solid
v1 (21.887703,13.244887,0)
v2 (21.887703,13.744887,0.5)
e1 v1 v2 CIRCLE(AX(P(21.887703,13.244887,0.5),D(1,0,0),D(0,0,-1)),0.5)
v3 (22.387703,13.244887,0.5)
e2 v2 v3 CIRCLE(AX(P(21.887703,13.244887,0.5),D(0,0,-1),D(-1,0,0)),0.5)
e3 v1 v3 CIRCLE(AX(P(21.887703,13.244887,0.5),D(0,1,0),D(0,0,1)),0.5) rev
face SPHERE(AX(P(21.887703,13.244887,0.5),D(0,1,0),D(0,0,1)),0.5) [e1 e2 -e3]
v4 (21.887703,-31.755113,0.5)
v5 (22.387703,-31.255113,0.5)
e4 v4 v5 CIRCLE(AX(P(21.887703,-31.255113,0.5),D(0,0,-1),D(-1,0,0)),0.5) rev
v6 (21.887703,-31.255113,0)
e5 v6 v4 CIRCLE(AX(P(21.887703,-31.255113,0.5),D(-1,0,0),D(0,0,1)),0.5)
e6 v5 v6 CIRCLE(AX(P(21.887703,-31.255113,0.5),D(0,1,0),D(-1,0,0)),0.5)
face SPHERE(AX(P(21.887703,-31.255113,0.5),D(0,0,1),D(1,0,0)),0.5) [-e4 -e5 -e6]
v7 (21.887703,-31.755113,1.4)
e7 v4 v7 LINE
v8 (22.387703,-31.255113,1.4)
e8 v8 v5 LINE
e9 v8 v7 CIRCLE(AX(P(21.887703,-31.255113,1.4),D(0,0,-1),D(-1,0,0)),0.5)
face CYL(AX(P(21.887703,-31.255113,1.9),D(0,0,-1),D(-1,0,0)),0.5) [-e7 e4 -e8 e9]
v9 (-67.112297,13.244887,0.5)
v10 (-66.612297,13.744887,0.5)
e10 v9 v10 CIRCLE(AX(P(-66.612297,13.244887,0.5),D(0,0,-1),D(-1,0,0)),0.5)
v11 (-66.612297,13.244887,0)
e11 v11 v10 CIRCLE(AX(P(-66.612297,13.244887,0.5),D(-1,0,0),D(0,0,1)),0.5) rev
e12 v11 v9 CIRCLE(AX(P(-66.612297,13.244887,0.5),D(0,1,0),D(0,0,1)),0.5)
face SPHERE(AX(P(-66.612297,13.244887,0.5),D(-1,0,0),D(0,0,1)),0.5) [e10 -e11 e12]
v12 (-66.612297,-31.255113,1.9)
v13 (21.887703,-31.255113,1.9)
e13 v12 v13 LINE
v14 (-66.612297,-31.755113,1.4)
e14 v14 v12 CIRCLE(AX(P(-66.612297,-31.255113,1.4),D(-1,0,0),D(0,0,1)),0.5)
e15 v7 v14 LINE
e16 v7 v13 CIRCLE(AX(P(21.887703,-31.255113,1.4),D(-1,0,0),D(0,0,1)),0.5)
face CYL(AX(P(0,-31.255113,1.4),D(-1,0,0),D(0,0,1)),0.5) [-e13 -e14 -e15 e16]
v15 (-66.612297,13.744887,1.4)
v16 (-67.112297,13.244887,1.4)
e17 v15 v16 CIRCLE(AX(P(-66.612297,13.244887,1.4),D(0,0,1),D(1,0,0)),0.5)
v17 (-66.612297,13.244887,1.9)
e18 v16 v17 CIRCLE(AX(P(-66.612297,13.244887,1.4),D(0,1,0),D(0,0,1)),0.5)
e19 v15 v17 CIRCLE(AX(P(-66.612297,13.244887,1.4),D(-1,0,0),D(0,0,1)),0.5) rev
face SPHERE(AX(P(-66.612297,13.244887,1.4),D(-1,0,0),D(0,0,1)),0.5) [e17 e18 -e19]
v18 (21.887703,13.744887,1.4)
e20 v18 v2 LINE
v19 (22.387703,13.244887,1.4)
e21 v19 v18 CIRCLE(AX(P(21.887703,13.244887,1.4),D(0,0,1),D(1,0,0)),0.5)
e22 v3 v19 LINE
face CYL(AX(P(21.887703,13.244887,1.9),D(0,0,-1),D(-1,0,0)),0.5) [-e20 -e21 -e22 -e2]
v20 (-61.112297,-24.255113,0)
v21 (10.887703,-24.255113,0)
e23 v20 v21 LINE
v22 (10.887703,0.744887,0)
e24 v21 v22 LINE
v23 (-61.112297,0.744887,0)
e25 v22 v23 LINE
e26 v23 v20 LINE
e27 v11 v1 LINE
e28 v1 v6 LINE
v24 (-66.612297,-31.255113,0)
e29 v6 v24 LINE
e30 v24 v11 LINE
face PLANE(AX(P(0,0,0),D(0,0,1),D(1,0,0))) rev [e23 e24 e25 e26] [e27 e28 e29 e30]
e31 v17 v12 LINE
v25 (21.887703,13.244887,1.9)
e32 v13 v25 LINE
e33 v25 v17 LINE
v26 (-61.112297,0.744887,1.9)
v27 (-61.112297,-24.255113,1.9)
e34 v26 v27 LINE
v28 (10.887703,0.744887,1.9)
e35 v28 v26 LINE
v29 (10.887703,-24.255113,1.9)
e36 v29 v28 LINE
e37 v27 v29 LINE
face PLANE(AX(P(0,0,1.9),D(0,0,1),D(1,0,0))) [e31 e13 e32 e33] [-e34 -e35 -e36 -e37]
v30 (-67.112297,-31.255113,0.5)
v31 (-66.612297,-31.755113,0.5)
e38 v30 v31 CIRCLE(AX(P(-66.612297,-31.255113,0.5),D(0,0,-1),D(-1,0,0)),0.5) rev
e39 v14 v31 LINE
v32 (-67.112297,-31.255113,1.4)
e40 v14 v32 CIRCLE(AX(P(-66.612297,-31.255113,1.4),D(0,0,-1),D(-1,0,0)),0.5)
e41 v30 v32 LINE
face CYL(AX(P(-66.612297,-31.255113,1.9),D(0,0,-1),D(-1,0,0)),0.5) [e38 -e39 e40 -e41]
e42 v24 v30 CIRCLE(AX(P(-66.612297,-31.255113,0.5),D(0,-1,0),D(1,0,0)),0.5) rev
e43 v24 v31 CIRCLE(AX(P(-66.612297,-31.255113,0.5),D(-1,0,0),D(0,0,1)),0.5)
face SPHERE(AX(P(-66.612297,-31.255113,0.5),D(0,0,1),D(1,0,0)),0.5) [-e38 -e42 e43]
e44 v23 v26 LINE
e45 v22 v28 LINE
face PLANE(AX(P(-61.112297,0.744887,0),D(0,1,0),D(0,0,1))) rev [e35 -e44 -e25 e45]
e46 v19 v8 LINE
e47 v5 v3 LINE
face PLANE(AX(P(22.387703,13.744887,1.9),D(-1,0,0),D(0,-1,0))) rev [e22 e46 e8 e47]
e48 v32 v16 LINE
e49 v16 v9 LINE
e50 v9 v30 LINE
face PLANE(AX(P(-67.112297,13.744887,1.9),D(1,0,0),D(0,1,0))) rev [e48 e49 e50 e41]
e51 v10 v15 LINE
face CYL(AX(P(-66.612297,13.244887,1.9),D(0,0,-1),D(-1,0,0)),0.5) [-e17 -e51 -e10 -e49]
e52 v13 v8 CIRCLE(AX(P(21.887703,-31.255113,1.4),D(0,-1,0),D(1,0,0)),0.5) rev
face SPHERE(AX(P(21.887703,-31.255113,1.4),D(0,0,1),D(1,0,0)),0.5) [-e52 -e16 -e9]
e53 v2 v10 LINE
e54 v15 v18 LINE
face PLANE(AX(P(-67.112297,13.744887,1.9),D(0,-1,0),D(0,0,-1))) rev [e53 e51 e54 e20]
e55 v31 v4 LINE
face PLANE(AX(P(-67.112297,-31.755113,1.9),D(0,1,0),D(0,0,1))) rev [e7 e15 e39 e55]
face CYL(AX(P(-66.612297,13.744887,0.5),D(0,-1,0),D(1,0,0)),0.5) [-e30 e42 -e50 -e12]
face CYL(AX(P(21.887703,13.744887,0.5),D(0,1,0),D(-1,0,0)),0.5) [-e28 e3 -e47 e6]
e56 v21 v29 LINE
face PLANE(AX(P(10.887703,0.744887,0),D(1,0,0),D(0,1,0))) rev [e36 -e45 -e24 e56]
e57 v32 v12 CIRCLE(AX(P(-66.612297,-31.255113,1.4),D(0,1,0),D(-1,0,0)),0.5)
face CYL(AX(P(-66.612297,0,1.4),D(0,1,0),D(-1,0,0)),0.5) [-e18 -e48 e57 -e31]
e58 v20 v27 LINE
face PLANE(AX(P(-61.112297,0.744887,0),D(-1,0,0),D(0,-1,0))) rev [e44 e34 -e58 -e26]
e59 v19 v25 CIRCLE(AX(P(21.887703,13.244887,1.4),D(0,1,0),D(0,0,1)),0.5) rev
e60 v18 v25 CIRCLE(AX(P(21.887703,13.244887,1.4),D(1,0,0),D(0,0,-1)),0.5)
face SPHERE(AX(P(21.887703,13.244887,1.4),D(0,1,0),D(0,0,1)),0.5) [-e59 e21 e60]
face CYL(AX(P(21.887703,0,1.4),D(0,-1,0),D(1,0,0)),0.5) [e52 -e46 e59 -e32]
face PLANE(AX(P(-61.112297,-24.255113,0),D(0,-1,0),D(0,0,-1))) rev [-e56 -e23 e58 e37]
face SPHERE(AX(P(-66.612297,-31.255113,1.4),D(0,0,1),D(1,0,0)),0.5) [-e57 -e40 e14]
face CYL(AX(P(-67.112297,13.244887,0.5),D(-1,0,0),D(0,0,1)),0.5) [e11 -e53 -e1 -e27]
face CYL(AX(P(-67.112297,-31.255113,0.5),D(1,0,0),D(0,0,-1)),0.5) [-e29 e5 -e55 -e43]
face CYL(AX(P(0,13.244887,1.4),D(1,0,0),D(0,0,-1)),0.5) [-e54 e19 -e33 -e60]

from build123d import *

# Parameters (mm, degrees)
SKETCH1_W               = 89.5
SKETCH1_H               = 45.5
BOSS_EXTRUDE1_DEPTH     = 1.9
FILLET1_R               = 0.5
FILLET2_R               = 0.5
CUT_EXTRUDE1_DEPTH      = 75.270166564
CUT_EXTRUDE1_DEPTH_BACK = 75.270166564
SKETCH2_W               = 72
SKETCH2_H               = 25


with BuildPart() as part:
    # Sketch1 → Boss-Extrude1 (new body)
    with BuildSketch(Plane.XY):
        with Locations((-22.362297468, -9.005112503)):
            Rectangle(SKETCH1_W, SKETCH1_H)
    extrude(amount=BOSS_EXTRUDE1_DEPTH)

    # Fillet1
    fillet1_edges = [part.edges().sort_by_distance(p)[0] for p in [
        (22.387702532, -9.005112503, 1.9),
        (-22.362297468, 13.744887497, 1.9),
        (-67.112297468, -9.005112503, 1.9),
        (-22.362297468, 13.744887497, 0),
        (22.387702532, -9.005112503, 0),
        (-67.112297468, -9.005112503, 0),
        (-67.112297468, 13.744887497, 0.95),
        (22.387702532, 13.744887497, 0.95),
        (22.387702532, -31.755112503, 0.95),
        (-67.112297468, -31.755112503, 0.95),
    ]]
    fillet(fillet1_edges, radius=FILLET1_R)

    # Fillet2
    # the kernel refuses this fillet: 0.5 mm, written as the material it takes off along each edge
    with BuildSketch(Plane(origin=(-66.612297468, -31.255112503, 1.4), x_dir=(0, -1, 0), z_dir=(0, 0, 1))) as fillet2_piece_1_section:
        Polygon((0, 0), (FILLET2_R, 0), (FILLET2_R, -FILLET2_R), (0, -FILLET2_R), align=None)
    fillet2_piece_1 = extrude(amount=FILLET2_R, mode=Mode.PRIVATE)
    fillet2_piece_1 = fillet2_piece_1 - Plane(origin=(-66.612297468, -31.255112503, 1.4), x_dir=(0.7071067811865475, 0.7071067811865477, 0), z_dir=(0, 0, 1)) * Sphere(FILLET2_R, mode=Mode.PRIVATE)
    add(fillet2_piece_1, mode=Mode.SUBTRACT)
    with BuildSketch(Plane(origin=(-66.612297468, -31.255112503, 0.5), x_dir=(0, -1, 0), z_dir=(0, 0, -1))) as fillet2_piece_2_section:
        Polygon((0, 0), (FILLET2_R, 0), (FILLET2_R, FILLET2_R), (0, FILLET2_R), align=None)
    fillet2_piece_2 = extrude(amount=FILLET2_R, mode=Mode.PRIVATE)
    fillet2_piece_2 = fillet2_piece_2 - Plane(origin=(-66.612297468, -31.255112503, 0.5), x_dir=(0.7071067811865475, 0.7071067811865477, 0), z_dir=(0, 0, -1)) * Sphere(FILLET2_R, mode=Mode.PRIVATE)
    add(fillet2_piece_2, mode=Mode.SUBTRACT)
    with BuildSketch(Plane(origin=(21.887702532, -31.255112503, 1.4), x_dir=(0, -1, 0), z_dir=(0, 0, 1))) as fillet2_piece_3_section:
        Polygon((0, 0), (FILLET2_R, 0), (FILLET2_R, FILLET2_R), (0, FILLET2_R), align=None)
    fillet2_piece_3 = extrude(amount=FILLET2_R, mode=Mode.PRIVATE)
    fillet2_piece_3 = fillet2_piece_3 - Plane(origin=(21.887702532, -31.255112503, 1.4), x_dir=(-0.7071067811865476, 0.7071067811865474, 0), z_dir=(0, 0, 1)) * Sphere(FILLET2_R, mode=Mode.PRIVATE)
    add(fillet2_piece_3, mode=Mode.SUBTRACT)
    with BuildSketch(Plane(origin=(21.887702532, -31.255112503, 0.5), x_dir=(0, -1, 0), z_dir=(0, 0, -1))) as fillet2_piece_4_section:
        Polygon((0, 0), (FILLET2_R, 0), (FILLET2_R, -FILLET2_R), (0, -FILLET2_R), align=None)
    fillet2_piece_4 = extrude(amount=FILLET2_R, mode=Mode.PRIVATE)
    fillet2_piece_4 = fillet2_piece_4 - Plane(origin=(21.887702532, -31.255112503, 0.5), x_dir=(-0.7071067811865476, 0.7071067811865474, 0), z_dir=(0, 0, -1)) * Sphere(FILLET2_R, mode=Mode.PRIVATE)
    add(fillet2_piece_4, mode=Mode.SUBTRACT)
    with BuildSketch(Plane(origin=(21.887702532, -31.755112503, 0), x_dir=(0, 1, 0), z_dir=(-1, 0, 0))) as fillet2_piece_5:
        with BuildLine():
            CenterArc((FILLET2_R, -FILLET2_R), FILLET2_R, 90, 90)
            Line((0, -FILLET2_R), (0, 0))
            Line((0, 0), (FILLET2_R, 0))
        make_face()
    extrude(amount=88.5, mode=Mode.SUBTRACT)
    with BuildSketch(Plane(origin=(21.887702532, -31.755112503, 1.9), x_dir=(0, 1, 0), z_dir=(-1, 0, 0))) as fillet2_piece_6:
        with BuildLine():
            CenterArc((FILLET2_R, FILLET2_R), FILLET2_R, 180, 90)
            Line((0, FILLET2_R), (0, 0))
            Line((0, 0), (FILLET2_R, 0))
        make_face()
    extrude(amount=88.5, mode=Mode.SUBTRACT)

    # Sketch2 → Cut-Extrude1 (cut, two sides: drawn at the far end of the back side and taken through both)
    with BuildSketch(Plane.XY.offset(1.9).offset(-CUT_EXTRUDE1_DEPTH_BACK)):
        with Locations((-25.112297468, -11.755112503)):
            Rectangle(SKETCH2_W, SKETCH2_H)
    extrude(amount=CUT_EXTRUDE1_DEPTH + CUT_EXTRUDE1_DEPTH_BACK, mode=Mode.SUBTRACT)


solid = part.part
